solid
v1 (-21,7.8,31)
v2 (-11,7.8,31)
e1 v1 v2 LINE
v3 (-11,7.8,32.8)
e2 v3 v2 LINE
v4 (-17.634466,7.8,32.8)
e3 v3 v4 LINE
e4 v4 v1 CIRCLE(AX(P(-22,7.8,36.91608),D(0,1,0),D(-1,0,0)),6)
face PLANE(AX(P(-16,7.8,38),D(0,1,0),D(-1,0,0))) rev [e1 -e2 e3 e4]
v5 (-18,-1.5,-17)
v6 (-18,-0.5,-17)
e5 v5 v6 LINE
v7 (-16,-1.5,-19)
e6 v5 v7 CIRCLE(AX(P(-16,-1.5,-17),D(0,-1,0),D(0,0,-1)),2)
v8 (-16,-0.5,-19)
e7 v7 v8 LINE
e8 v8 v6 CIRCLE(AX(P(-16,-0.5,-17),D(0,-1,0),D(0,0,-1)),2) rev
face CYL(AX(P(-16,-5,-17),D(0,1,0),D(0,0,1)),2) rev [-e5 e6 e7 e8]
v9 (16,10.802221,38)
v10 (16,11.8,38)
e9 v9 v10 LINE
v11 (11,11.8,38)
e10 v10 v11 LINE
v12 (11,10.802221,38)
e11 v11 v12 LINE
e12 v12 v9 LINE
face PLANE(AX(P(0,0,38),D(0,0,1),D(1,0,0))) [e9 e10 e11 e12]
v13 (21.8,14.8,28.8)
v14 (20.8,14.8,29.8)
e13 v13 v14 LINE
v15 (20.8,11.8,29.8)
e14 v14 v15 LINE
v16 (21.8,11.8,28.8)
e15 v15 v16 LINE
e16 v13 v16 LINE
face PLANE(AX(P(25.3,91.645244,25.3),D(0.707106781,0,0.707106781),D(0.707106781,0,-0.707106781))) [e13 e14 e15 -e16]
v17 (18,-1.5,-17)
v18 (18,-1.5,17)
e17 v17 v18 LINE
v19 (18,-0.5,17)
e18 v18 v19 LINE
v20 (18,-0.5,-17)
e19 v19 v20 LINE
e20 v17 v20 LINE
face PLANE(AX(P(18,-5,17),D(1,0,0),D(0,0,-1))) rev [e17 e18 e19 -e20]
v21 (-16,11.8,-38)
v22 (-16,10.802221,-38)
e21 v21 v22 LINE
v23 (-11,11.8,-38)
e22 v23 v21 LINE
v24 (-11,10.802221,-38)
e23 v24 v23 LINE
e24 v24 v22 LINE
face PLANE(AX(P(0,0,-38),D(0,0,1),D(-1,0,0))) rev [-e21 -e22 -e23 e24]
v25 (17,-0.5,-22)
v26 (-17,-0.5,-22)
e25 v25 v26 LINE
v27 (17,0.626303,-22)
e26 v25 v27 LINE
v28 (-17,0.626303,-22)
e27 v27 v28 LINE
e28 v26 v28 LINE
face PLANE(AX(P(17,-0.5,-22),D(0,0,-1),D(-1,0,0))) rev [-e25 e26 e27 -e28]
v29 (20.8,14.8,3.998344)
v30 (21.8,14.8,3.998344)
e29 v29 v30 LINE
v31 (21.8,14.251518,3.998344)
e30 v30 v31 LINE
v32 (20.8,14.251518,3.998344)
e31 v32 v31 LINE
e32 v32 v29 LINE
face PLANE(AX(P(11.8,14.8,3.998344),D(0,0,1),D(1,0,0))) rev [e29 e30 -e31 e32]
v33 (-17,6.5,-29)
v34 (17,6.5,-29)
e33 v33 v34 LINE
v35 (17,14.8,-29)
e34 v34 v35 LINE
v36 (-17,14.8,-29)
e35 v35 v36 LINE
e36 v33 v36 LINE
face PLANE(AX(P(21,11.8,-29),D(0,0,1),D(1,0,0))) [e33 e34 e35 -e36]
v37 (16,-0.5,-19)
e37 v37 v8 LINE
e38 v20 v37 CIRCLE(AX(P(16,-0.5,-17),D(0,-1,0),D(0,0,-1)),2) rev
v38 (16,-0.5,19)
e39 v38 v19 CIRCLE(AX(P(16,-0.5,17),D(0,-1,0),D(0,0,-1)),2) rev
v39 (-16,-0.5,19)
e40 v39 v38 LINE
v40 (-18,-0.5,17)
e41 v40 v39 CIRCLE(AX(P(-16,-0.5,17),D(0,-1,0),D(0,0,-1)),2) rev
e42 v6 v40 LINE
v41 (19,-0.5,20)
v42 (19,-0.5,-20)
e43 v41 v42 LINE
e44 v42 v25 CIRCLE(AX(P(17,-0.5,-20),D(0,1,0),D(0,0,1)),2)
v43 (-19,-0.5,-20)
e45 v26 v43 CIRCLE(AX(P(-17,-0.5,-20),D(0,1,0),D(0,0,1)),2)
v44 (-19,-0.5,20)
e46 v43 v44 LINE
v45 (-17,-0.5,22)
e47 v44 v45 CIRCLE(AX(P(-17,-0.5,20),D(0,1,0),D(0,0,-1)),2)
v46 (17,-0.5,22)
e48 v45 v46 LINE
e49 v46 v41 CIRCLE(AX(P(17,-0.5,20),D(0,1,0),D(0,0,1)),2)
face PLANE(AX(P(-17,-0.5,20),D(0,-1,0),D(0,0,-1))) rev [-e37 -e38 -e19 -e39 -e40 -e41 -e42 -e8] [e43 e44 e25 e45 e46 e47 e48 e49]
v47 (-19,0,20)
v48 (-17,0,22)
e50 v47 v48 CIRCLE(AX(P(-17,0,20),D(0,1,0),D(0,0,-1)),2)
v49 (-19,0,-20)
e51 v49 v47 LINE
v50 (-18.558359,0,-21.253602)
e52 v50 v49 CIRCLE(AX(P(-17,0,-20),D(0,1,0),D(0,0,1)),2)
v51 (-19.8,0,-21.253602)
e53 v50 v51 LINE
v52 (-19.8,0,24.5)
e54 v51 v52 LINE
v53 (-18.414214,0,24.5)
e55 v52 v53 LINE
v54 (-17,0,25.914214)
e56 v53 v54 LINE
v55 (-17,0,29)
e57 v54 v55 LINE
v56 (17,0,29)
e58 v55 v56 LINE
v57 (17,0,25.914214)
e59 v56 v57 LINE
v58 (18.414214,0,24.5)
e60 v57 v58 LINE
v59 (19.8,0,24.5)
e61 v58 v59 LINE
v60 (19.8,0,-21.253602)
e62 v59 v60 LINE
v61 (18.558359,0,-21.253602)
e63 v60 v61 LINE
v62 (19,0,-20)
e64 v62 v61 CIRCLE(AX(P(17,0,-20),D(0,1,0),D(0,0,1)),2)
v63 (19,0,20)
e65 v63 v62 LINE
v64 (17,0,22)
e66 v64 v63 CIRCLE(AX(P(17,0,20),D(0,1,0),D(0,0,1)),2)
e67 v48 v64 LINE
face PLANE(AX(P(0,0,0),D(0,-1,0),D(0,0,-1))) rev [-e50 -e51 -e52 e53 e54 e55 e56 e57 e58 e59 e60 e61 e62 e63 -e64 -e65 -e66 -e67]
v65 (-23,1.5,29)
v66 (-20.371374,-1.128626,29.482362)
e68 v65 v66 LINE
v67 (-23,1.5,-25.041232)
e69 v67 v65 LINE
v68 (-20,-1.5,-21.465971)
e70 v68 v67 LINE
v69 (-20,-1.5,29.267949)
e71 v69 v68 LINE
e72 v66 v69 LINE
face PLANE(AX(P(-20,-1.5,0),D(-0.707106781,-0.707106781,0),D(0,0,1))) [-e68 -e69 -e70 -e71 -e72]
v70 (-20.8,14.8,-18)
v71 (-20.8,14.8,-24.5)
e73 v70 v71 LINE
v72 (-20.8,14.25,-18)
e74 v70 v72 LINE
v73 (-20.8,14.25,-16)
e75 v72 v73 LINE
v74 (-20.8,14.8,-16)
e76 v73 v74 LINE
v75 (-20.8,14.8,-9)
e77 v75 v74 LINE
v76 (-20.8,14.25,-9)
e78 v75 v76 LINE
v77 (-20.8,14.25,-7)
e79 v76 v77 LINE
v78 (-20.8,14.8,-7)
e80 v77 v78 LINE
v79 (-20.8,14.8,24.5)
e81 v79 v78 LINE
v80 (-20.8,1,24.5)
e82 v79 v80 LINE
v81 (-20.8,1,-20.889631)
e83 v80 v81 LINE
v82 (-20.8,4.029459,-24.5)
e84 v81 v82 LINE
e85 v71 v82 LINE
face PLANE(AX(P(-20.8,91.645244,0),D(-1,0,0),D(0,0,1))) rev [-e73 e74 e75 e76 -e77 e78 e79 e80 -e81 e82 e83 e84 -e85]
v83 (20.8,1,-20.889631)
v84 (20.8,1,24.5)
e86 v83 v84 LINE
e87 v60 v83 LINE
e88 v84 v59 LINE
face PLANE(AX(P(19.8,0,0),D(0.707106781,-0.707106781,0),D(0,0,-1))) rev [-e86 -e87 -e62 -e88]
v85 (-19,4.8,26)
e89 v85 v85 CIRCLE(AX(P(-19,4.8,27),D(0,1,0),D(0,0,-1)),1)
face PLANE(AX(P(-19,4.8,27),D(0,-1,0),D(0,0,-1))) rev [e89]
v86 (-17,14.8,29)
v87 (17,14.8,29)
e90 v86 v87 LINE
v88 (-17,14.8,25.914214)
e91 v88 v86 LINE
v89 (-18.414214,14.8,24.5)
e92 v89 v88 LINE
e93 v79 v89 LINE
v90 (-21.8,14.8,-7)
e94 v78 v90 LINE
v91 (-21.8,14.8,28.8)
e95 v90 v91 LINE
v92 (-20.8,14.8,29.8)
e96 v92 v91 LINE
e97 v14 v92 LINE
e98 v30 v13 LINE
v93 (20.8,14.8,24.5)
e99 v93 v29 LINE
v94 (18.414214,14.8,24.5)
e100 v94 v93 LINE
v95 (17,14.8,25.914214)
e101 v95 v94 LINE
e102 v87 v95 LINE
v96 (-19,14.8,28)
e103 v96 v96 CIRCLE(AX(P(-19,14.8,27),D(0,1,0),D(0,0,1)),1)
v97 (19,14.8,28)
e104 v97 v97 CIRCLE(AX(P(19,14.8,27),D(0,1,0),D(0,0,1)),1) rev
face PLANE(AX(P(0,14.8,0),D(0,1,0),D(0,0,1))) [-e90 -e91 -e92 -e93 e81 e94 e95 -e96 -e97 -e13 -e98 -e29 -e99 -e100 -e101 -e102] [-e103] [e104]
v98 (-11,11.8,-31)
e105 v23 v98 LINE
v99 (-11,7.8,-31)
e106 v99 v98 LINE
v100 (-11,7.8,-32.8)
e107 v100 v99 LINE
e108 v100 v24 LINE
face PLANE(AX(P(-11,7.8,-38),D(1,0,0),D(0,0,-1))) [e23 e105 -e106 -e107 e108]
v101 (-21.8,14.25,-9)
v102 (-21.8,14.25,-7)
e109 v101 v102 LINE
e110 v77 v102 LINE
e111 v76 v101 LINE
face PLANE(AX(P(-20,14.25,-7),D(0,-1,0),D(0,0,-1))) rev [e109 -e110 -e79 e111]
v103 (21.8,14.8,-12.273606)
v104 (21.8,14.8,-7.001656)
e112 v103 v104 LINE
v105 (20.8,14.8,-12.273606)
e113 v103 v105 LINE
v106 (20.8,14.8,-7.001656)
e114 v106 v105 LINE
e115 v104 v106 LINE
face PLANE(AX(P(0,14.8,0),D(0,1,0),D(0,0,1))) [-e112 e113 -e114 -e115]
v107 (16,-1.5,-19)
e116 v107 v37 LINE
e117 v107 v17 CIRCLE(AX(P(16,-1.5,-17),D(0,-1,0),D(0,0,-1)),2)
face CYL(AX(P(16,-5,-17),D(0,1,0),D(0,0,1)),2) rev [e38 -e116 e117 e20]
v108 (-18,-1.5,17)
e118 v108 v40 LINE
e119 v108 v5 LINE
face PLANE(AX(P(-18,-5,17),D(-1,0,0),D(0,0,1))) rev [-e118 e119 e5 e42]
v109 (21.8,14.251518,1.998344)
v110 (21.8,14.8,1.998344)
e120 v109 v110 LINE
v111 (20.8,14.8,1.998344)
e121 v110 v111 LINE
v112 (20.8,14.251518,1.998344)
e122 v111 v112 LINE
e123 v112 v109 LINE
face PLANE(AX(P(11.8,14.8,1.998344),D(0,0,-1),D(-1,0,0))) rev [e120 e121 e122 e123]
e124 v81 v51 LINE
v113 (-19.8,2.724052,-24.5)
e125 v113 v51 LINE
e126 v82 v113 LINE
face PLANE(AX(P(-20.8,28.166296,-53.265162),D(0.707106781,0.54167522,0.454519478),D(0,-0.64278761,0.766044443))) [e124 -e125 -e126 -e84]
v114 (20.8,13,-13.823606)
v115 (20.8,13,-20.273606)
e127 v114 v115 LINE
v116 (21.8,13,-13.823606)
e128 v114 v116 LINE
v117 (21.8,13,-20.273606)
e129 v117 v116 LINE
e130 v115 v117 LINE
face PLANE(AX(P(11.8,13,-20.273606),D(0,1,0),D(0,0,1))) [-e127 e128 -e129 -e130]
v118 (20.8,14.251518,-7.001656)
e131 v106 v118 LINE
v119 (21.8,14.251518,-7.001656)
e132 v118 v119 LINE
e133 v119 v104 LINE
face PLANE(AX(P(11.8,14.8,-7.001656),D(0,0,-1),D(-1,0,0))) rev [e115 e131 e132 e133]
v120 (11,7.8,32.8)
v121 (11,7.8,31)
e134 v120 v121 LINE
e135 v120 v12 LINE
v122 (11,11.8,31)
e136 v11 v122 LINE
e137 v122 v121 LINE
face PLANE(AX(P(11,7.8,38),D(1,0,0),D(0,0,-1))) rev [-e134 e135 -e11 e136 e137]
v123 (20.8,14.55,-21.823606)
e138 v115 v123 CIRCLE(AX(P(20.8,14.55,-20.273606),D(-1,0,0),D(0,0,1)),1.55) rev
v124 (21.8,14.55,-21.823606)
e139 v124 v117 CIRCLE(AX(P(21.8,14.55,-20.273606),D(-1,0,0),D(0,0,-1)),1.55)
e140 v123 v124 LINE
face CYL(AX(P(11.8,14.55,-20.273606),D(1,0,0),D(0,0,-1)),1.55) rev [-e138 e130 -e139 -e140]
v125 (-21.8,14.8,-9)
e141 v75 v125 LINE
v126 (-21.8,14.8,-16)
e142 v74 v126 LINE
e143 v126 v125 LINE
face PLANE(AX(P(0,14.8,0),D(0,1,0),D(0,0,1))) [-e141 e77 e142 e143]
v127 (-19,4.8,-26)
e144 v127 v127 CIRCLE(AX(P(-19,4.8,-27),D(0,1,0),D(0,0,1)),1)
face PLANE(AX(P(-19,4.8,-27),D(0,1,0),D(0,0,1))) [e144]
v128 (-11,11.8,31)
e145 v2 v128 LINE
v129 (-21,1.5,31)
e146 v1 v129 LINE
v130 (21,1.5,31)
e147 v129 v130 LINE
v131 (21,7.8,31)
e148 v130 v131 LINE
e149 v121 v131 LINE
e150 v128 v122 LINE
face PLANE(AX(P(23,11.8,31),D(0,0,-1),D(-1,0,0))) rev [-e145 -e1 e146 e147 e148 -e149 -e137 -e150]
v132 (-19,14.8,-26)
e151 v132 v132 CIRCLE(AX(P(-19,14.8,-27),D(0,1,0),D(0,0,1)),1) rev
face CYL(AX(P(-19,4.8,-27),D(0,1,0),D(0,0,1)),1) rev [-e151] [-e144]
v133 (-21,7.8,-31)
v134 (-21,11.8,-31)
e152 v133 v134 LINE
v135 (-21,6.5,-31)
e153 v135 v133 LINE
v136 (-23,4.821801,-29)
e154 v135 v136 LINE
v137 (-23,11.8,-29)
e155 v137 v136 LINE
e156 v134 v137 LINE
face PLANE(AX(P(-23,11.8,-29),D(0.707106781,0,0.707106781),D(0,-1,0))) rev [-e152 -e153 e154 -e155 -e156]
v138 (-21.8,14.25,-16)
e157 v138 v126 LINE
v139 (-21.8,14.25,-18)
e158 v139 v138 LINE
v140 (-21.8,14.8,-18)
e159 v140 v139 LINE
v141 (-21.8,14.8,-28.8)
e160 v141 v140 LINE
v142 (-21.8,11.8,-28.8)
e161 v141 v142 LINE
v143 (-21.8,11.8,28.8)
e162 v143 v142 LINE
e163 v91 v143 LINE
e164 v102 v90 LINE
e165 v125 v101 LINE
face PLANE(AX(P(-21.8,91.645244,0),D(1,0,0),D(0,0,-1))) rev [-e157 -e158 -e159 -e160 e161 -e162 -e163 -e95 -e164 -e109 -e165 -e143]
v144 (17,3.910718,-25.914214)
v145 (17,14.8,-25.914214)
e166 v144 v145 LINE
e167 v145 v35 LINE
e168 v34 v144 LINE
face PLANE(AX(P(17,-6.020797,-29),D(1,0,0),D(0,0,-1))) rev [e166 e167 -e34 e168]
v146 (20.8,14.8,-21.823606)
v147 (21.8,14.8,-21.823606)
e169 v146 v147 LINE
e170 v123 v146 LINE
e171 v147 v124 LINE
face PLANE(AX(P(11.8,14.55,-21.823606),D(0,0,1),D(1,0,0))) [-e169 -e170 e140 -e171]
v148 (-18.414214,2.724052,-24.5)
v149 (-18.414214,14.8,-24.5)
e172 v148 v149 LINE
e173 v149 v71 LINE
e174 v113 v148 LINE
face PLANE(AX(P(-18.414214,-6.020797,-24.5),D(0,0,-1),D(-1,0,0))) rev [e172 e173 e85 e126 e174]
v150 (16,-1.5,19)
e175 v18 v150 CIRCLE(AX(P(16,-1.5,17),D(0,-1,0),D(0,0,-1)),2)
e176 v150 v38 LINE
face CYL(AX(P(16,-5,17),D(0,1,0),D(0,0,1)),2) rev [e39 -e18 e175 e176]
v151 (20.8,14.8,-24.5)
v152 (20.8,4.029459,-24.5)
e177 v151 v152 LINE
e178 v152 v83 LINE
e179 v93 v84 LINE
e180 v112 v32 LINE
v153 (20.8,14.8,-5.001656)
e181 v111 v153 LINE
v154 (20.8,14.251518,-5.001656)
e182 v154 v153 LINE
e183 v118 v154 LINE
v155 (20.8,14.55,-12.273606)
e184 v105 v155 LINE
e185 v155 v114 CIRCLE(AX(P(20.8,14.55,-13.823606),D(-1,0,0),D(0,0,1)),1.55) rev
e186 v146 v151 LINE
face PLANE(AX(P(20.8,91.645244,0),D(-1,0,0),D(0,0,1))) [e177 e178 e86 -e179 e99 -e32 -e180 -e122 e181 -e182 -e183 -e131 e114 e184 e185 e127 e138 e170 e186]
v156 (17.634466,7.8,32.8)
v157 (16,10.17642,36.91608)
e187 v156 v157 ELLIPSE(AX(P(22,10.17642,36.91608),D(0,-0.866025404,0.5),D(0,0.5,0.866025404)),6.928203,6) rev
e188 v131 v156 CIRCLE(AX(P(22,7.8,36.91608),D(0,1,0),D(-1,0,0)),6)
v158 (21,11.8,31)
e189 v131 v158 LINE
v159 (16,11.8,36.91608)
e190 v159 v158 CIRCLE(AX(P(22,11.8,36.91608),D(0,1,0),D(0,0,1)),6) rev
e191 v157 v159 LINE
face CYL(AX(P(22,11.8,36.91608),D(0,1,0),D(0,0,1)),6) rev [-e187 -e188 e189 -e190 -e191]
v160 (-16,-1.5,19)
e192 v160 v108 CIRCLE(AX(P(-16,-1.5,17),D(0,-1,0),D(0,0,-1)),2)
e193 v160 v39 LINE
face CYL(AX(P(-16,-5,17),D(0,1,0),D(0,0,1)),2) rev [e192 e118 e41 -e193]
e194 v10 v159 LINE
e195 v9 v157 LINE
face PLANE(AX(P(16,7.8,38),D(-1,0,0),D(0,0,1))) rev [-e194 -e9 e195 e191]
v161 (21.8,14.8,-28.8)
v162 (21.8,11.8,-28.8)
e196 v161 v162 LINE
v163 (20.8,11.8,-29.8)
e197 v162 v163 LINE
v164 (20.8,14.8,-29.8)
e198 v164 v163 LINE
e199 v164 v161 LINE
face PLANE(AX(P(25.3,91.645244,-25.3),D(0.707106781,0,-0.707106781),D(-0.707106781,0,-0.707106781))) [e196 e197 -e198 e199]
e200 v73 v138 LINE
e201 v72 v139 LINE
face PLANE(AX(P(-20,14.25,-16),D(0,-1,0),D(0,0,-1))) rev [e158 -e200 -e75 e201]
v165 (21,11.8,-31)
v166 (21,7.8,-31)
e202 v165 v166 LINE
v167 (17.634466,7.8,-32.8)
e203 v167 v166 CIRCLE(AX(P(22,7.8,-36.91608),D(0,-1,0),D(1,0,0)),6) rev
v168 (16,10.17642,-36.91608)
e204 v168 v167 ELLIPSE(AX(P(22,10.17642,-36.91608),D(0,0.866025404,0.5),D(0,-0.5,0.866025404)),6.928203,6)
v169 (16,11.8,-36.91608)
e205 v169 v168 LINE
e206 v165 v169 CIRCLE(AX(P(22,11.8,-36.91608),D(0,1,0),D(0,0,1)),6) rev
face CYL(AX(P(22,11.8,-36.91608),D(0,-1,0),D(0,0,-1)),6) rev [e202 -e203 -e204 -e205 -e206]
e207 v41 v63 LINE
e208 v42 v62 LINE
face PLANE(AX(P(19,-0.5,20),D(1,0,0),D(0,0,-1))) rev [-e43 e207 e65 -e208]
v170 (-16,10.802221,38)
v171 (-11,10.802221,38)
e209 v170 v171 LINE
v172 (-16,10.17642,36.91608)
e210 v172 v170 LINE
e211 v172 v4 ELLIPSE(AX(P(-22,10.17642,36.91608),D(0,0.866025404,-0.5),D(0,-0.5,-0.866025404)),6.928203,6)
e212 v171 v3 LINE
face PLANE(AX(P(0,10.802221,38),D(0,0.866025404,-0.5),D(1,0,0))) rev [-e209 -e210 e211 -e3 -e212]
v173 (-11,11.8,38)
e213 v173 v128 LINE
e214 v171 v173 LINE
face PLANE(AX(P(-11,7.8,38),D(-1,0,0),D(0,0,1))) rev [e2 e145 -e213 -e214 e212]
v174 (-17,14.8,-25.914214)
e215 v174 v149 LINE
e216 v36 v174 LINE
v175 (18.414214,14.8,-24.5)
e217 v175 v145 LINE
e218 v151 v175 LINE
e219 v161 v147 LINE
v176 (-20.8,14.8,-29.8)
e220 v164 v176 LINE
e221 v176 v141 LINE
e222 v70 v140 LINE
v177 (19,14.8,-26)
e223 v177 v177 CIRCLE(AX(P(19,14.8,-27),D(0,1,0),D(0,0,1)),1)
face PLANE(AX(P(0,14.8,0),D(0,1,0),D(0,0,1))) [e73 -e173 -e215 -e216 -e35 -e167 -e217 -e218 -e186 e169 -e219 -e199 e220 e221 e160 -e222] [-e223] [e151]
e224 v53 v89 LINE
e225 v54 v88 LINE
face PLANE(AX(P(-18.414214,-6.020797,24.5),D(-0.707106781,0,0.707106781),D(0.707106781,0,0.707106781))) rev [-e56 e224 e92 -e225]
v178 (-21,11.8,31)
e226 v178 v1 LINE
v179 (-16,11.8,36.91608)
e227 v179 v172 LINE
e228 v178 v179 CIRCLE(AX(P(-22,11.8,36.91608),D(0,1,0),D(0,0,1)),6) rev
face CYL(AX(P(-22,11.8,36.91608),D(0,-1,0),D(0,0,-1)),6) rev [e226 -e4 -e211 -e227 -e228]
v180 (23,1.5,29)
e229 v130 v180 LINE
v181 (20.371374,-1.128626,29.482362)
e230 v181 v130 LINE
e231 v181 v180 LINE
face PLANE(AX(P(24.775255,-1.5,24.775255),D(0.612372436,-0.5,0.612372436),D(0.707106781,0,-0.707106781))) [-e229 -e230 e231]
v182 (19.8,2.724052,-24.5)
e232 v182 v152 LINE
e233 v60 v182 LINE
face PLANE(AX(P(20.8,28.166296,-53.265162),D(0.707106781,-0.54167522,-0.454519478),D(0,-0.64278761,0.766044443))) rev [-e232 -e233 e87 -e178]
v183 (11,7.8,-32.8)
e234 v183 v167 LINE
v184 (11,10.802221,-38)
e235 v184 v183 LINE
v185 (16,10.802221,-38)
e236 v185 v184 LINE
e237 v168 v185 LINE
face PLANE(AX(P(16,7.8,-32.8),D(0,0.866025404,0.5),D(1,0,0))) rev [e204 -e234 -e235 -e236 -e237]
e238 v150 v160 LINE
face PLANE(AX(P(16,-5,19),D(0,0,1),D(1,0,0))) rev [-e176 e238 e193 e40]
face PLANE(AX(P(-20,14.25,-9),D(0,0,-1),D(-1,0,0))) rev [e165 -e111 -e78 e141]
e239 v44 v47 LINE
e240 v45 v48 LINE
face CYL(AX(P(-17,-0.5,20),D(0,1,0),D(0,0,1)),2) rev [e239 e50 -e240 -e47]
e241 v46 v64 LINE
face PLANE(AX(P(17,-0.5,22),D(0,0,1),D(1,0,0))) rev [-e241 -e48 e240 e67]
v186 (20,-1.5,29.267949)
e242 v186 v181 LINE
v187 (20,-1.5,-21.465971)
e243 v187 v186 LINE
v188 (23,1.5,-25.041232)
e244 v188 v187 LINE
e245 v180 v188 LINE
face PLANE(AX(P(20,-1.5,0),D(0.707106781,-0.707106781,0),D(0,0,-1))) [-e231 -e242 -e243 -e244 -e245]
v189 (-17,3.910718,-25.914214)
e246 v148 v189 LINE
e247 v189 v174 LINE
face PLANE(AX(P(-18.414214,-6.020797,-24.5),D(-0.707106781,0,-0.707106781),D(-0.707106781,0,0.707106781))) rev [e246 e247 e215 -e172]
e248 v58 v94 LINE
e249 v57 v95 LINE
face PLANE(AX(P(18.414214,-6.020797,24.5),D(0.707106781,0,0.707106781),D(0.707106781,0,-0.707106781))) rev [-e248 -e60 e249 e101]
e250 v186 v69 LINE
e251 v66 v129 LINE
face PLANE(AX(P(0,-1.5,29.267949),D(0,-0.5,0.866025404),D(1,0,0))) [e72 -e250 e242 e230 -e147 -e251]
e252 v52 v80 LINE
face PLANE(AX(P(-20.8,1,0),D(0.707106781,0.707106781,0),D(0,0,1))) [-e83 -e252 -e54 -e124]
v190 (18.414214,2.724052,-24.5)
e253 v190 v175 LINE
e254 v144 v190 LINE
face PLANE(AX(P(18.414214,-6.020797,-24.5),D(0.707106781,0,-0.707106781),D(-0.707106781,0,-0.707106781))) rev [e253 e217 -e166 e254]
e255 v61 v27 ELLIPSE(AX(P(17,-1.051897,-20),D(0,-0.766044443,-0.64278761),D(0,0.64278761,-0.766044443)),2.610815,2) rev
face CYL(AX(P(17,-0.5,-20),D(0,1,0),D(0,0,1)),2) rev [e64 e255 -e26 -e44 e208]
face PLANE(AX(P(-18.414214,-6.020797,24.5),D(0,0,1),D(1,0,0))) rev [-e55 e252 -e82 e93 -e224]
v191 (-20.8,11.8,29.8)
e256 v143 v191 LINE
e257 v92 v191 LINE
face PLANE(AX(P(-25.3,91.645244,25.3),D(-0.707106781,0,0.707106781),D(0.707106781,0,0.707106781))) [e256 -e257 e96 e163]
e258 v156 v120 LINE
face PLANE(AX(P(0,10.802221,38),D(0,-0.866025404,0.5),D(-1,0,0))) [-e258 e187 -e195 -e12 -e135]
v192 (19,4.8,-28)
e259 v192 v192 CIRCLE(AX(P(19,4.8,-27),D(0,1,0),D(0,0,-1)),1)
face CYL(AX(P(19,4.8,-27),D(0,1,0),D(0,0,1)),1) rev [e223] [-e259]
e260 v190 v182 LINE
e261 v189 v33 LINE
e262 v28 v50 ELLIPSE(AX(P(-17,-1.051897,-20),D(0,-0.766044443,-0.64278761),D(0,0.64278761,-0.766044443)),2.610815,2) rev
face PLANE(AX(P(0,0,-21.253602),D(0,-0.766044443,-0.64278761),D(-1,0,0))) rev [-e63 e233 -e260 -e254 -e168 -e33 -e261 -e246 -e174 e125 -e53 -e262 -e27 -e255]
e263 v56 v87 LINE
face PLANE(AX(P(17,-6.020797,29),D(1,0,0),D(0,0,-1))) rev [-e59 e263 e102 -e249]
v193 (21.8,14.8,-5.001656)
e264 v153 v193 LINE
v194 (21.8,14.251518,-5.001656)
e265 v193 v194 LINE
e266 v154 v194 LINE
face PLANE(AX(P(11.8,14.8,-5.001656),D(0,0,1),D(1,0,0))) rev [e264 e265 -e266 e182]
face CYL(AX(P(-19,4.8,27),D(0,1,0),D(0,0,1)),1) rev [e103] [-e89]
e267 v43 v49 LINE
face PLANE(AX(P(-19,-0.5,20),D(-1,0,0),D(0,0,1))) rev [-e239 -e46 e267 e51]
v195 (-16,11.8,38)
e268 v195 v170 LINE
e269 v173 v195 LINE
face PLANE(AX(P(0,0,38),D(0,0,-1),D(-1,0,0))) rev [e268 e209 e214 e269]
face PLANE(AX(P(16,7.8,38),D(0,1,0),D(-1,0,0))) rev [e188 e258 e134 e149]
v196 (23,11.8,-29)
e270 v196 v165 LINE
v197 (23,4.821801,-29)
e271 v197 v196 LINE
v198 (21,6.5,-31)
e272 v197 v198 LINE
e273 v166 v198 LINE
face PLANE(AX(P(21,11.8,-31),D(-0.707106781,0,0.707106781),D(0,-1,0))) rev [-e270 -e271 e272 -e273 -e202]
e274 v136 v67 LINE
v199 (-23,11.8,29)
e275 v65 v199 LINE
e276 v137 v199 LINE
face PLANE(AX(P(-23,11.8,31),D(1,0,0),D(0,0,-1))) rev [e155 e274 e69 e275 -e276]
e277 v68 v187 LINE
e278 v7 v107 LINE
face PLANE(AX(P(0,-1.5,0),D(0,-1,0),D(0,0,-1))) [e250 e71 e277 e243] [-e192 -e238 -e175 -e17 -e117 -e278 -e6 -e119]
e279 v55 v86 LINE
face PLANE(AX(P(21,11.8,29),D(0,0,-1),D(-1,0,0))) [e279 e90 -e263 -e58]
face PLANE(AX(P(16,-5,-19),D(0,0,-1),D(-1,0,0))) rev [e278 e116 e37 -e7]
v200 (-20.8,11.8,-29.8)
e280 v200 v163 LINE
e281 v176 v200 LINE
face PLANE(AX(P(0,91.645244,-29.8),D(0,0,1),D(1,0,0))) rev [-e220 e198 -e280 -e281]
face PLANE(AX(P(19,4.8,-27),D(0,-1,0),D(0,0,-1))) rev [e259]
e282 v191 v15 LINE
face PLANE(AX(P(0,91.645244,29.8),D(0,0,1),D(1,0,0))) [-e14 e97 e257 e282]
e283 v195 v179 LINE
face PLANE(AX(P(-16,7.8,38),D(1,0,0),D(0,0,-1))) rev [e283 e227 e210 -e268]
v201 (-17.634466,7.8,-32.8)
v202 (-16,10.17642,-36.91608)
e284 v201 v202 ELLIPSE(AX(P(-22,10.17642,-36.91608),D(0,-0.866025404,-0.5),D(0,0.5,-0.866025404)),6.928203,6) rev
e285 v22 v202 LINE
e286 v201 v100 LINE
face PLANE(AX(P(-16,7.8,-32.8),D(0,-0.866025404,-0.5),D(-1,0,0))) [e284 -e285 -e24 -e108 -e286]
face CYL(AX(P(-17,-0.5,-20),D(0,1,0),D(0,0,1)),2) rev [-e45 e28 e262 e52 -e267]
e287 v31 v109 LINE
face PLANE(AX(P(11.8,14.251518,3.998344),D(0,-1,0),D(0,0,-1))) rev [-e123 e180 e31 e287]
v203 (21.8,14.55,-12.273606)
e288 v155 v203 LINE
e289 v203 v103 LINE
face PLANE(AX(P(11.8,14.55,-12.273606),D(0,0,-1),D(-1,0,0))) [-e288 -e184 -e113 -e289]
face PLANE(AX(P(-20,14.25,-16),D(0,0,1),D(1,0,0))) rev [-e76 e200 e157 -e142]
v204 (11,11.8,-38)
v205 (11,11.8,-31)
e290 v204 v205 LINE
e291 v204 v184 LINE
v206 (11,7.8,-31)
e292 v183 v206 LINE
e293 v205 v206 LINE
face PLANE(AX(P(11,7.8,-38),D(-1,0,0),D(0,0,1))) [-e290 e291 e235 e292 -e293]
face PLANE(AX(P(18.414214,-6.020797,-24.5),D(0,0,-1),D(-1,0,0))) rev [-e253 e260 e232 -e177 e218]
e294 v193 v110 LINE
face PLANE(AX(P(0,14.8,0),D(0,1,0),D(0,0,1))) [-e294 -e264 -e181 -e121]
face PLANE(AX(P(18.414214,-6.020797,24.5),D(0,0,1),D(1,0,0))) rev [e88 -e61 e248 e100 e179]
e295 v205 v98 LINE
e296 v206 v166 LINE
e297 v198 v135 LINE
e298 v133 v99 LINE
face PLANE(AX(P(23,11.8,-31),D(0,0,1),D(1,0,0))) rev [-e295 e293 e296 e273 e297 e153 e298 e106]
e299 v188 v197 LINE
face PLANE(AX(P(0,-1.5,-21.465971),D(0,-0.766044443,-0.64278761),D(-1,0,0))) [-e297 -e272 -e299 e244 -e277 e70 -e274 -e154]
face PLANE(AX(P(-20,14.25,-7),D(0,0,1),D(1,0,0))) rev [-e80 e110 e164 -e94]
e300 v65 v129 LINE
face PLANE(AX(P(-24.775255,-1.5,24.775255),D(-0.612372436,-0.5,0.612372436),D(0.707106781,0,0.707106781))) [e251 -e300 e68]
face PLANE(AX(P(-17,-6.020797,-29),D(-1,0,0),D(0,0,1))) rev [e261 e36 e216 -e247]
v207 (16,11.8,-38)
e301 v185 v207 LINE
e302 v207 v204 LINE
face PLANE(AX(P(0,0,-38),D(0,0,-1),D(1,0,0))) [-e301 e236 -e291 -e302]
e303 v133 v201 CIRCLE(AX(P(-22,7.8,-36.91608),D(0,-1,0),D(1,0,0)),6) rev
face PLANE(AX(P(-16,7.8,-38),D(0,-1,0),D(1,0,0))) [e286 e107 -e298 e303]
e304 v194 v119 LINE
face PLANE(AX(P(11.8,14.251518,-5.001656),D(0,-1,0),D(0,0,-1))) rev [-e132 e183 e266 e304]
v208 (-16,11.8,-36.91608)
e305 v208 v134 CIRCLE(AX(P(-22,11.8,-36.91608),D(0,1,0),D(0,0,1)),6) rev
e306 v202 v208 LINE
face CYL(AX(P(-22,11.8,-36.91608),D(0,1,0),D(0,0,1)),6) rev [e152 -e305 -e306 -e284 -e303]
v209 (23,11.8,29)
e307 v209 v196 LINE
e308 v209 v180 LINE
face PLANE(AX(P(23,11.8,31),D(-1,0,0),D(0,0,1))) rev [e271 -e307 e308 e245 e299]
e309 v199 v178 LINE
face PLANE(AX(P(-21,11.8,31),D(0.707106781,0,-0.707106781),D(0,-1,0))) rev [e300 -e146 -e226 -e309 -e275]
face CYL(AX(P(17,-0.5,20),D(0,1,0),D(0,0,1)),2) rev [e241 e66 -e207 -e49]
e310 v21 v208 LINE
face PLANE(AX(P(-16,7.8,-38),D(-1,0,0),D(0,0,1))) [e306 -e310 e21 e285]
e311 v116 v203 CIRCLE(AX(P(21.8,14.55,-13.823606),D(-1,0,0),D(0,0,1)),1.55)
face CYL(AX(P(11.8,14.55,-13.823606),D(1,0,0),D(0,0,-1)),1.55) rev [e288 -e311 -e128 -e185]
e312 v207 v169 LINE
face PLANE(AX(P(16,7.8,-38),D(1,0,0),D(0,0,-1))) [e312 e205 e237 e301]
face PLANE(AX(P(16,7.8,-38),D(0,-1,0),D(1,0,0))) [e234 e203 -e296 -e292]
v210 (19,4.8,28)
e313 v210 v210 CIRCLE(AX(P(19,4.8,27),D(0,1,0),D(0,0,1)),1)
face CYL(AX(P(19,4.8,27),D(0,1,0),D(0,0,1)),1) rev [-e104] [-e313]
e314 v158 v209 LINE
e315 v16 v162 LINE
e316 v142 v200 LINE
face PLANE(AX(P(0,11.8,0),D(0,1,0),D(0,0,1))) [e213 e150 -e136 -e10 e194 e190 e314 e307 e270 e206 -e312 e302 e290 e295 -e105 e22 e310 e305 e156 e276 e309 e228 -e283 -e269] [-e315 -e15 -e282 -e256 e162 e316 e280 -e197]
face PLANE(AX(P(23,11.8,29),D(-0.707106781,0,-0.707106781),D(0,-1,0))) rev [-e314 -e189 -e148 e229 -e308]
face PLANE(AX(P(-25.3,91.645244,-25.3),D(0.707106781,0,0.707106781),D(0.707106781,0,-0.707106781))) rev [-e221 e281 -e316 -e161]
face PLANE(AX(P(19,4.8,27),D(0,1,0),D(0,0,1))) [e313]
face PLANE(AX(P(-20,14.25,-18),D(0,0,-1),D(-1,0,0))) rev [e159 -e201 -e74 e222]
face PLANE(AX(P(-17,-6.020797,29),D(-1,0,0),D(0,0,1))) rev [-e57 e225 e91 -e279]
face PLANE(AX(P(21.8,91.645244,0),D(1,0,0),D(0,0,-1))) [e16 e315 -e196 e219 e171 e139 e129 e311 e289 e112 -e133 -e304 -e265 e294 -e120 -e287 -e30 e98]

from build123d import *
from OCP.BRepFilletAPI import BRepFilletAPI_MakeChamfer

# Parameters (mm, degrees)
SKETCH1_W                           = 46
SKETCH1_H                           = 62
SKETCH1_W_2                         = 42
SKETCH1_H_2                         = 58
MAIN_SKETCH_DEPTH                   = 11.8
SKETCH2_W                           = 46
SKETCH2_H                           = 62
FLOOR_2_DEPTH                       = 1.5
CHAMFER_OUTER_CORNERS_SIZE          = 2
MATERIAL_FOR_HOLES_DEPTH            = 11.8
GLASS_HOLE_DEPTH                    = 5
GLASS_GLUING_SURFACE_DEPTH          = 0.5
CHAMFER_TOP_SIZE                    = 3
CHAMFER_TOP_SIZE2                   = 1.732050808
SKETCH21_R                          = 1
MOUNTING_HOLES_DEPTH                = 7
LOWER_START                         = 14.8
SKETCH22_R                          = 1
LOWER_TAB_DEPTH                     = 14.8
TYPE_C_CONNECTOR_DEPTH              = 10
SKETCH20_W                          = 5
SKETCH20_H                          = 4
STRAP_MOUNTS_DEPTH                  = 7
STRAP_CHAMFER_SIZE                  = 5.2
STRAP_CHAMFER_SIZE2                 = 3.0022214
STRAP_CHAMFER_OF_STRAP_MIRROR_SIZE  = 5.2
STRAP_CHAMFER_OF_STRAP_MIRROR_SIZE2 = 3.0022214
STRAP_FILLET_R                      = 6
SKETCH26_W                          = 2
SKETCH26_H                          = 0.54848205
BUTTON_CUTOUT_DEPTH                 = 10
SKETCH28_W                          = 2
SKETCH28_H                          = 0.55
CUT_EXTRUDE21_DEPTH                 = 1.8
CHAMFER7_START                      = -22
CHAMFER7_DEPTH                      = 44
CHAMFER7_2_DEPTH                    = 5
CHAMFER7_START_2                    = 17
CHAMFER7_3_DEPTH                    = 5
CHAMFER7_START_3                    = 4.8
CHAMFER7_4_OUTLINE_R                = 1
CHAMFER7_4_DEPTH                    = 2.2
CHAMFER7_5_DEPTH                    = 4.8
CHAMFER8_SIZE                       = 8
CHAMFER8_SIZE2                      = 9.534028741
CHAMFER11_SIZE                      = 1
CHAMFER12_SIZE                      = 3


with BuildPart() as part:
    # Sketch1 → Main sketch (new body)
    with BuildSketch(Plane(origin=(0, 0, 0), x_dir=(1, 0, 0), z_dir=(0, 1, 0))):
        Rectangle(SKETCH1_W, SKETCH1_H)
        Rectangle(SKETCH1_W_2, SKETCH1_H_2, mode=Mode.SUBTRACT)
    extrude(amount=MAIN_SKETCH_DEPTH)

    # Sketch2 → Floor 2 (add)
    with BuildSketch(Plane.XZ):
        Rectangle(SKETCH2_W, SKETCH2_H)
    extrude(amount=FLOOR_2_DEPTH)

    # Chamfer_Outer Corners
    chamfer_outer_corners_edges = [part.edges().sort_by_distance(p)[0] for p in [
        (-23, 5.15, -31),
        (23, 5.15, -31),
        (23, 5.15, 31),
        (-23, 5.15, 31),
    ]]
    chamfer(chamfer_outer_corners_edges, length=CHAMFER_OUTER_CORNERS_SIZE)

    # Sketch17 → Material for holes (add)
    with BuildSketch(Plane(origin=(0, 11.8, -8.5), x_dir=(1, 0, 0), z_dir=(0, -1, 0))):
        Polygon((18.414213562, 33), (21, 33), (21, 37.5), (17, 37.5), (17, 34.414213562), align=None)
        Polygon((18.414213562, -16), (17, -17.414213562), (17, -20.5), (21, -20.5), (21, -16), align=None)
        Polygon((-18.414213562, -16), (-21, -16), (-21, -20.5), (-17, -20.5), (-17, -17.414213562), align=None)
        Polygon((-18.414213562, 33), (-17, 34.414213562), (-17, 37.5), (-21, 37.5), (-21, 33), align=None)
    extrude(amount=MATERIAL_FOR_HOLES_DEPTH)

    # Sketch14 → Glass hole (cut)
    with BuildSketch(Plane(origin=(0, 0, 0), x_dir=(1, 0, 0), z_dir=(0, 1, 0))):
        with BuildLine():
            Line((16, -19), (-16, -19))
            ThreePointArc((-16, -19), (-17.414213562, -18.414213562), (-18, -17))
            Line((-18, -17), (-18, 17))
            ThreePointArc((-18, 17), (-17.414213562, 18.414213562), (-16, 19))
            Line((-16, 19), (16, 19))
            ThreePointArc((16, 19), (17.414213562, 18.414213562), (18, 17))
            Line((18, 17), (18, -17))
            ThreePointArc((18, -17), (17.414213562, -18.414213562), (16, -19))
        make_face()
    extrude(amount=-GLASS_HOLE_DEPTH, mode=Mode.SUBTRACT)

    # Sketch11 → Glass gluing surface (cut)
    with BuildSketch(Plane(origin=(0, 0, 0), x_dir=(1, 0, 0), z_dir=(0, 1, 0))):
        with BuildLine():
            Line((17, -22), (-17, -22))
            ThreePointArc((-17, -22), (-18.414213562, -21.414213562), (-19, -20))
            Line((-19, -20), (-19, 20))
            ThreePointArc((-19, 20), (-18.414213562, 21.414213562), (-17, 22))
            Line((-17, 22), (17, 22))
            ThreePointArc((17, 22), (18.414213562, 21.414213562), (19, 20))
            Line((19, 20), (19, -20))
            ThreePointArc((19, -20), (18.414213562, -21.414213562), (17, -22))
        make_face()
    extrude(amount=-GLASS_GLUING_SURFACE_DEPTH, mode=Mode.SUBTRACT)

    # Chamfer_ top: one chamfer whose edges measure the first distance from different faces: ONE call of the kernel's chamfer builder (chamfer() names one face for all edges)
    chamfer_top_edges_1 = [part.edges().sort_by_distance(p)[0] for p in [
        (0, -1.5, 31),
    ]]
    chamfer_top_side_1 = [part.faces().sort_by_distance(p)[0] for p in [
        (0, 5.15, 31),
    ]]
    chamfer_top_edges_2 = [part.edges().sort_by_distance(p)[0] for p in [
        (22, -1.5, 30),
    ]]
    chamfer_top_side_2 = [part.faces().sort_by_distance(p)[0] for p in [
        (22, 5.15, 30),
    ]]
    chamfer_top_edges_3 = [part.edges().sort_by_distance(p)[0] for p in [
        (-22, -1.5, 30),
    ]]
    chamfer_top_side_3 = [part.faces().sort_by_distance(p)[0] for p in [
        (-22, 5.15, 30),
    ]]
    chamfer_top = BRepFilletAPI_MakeChamfer(part.part.solid().wrapped)
    for e in chamfer_top_edges_1:
        chamfer_top.Add(CHAMFER_TOP_SIZE, CHAMFER_TOP_SIZE2, e.wrapped, chamfer_top_side_1[0].wrapped)  # the first distance lies on this face
    for e in chamfer_top_edges_2:
        chamfer_top.Add(CHAMFER_TOP_SIZE, CHAMFER_TOP_SIZE2, e.wrapped, chamfer_top_side_2[0].wrapped)  # the first distance lies on this face
    for e in chamfer_top_edges_3:
        chamfer_top.Add(CHAMFER_TOP_SIZE, CHAMFER_TOP_SIZE2, e.wrapped, chamfer_top_side_3[0].wrapped)  # the first distance lies on this face
    add(Compound.cast(chamfer_top.Shape()), mode=Mode.REPLACE)

    # Sketch21 → Mounting Holes (cut)
    with BuildSketch(Plane(origin=(0, 11.8, 0), x_dir=(1, 0, 0), z_dir=(0, 1, 0))):
        with Locations(Location((19, -27, 0), (0, 0, 270))):
            Circle(SKETCH21_R)
        with Locations(Location((-19, -27, 0), (0, 0, 90))):
            Circle(SKETCH21_R)
        with Locations(Location((-19, 27, 0), (0, 0, 270))):
            Circle(SKETCH21_R)
        with Locations(Location((19, 27, 0), (0, 0, 90))):
            Circle(SKETCH21_R)
    extrude(amount=-MOUNTING_HOLES_DEPTH, mode=Mode.SUBTRACT)

    # Sketch22 → Lower Tab (add)
    with BuildSketch(Plane(origin=(0, 0, 0), x_dir=(1, 0, 0), z_dir=(0, 1, 0)).offset(LOWER_START)):
        Polygon((20.8, 29.8), (-20.8, 29.8), (-21.8, 28.8), (-21.8, -28.8), (-20.8, -29.8), (20.8, -29.8), (21.8, -28.8), (21.8, 28.8), align=None)
        with Locations(Location((-19, -27, 0), (0, 0, 270))):
            Circle(SKETCH22_R, mode=Mode.SUBTRACT)
        with Locations(Location((19, -27, 0), (0, 0, 270))):
            Circle(SKETCH22_R, mode=Mode.SUBTRACT)
        with Locations(Location((-19, 27, 0), (0, 0, 270))):
            Circle(SKETCH22_R, mode=Mode.SUBTRACT)
        with Locations(Location((19, 27, 0), (0, 0, 270))):
            Circle(SKETCH22_R, mode=Mode.SUBTRACT)
        Polygon((-20.8, -24.5), (-18.414213562, -24.5), (-17, -25.914213562), (-17, -29), (17, -29), (17, -25.914213562), (18.414213562, -24.5), (20.8, -24.5), (20.8, 24.5), (18.414213562, 24.5), (17, 25.914213562), (17, 29), (-17, 29), (-17, 25.914213562), (-18.414213562, 24.5), (-20.8, 24.5), align=None, mode=Mode.SUBTRACT)
    extrude(amount=-LOWER_TAB_DEPTH)

    # Sketch24 → Type C Connector (cut)
    with BuildSketch(Plane(origin=(21.8, 0, -8), x_dir=(0, 0, 1), z_dir=(-1, 0, 0))):
        with BuildLine():
            Line((-13.823605705, 14.8), (-4.273605705, 14.8))
            Line((-4.273605705, 14.8), (-4.273605705, 14.55))
            ThreePointArc((-4.273605705, 14.55), (-4.727590194, 13.453984489), (-5.823605705, 13))
            Line((-5.823605705, 13), (-12.273605705, 13))
            ThreePointArc((-12.273605705, 13), (-13.369621216, 13.453984489), (-13.823605705, 14.55))
            Line((-13.823605705, 14.55), (-13.823605705, 14.8))
        make_face()
    extrude(amount=TYPE_C_CONNECTOR_DEPTH, mode=Mode.SUBTRACT)

    # Sketch20 → Strap Mounts (add)
    with BuildSketch(Plane.XY.offset(31)):
        with Locations((13.5, 9.8)):
            Rectangle(SKETCH20_W, SKETCH20_H)
        with Locations((-13.5, 9.8)):
            Rectangle(SKETCH20_W, SKETCH20_H)
    strap_mounts = extrude(amount=STRAP_MOUNTS_DEPTH)

    # Strap Chamfer: one chamfer whose edges measure the first distance from different faces: ONE call of the kernel's chamfer builder (chamfer() names one face for all edges)
    strap_chamfer_edges_1 = [part.edges().sort_by_distance(p)[0] for p in [
        (13.5, 7.8, 38),
    ]]
    strap_chamfer_side_1 = [part.faces().sort_by_distance(p)[0] for p in [
        (13.5, 7.8, 34.5),
    ]]
    strap_chamfer_edges_2 = [part.edges().sort_by_distance(p)[0] for p in [
        (-13.5, 7.8, 38),
    ]]
    strap_chamfer_side_2 = [part.faces().sort_by_distance(p)[0] for p in [
        (-13.5, 7.8, 34.5),
    ]]
    strap_chamfer = BRepFilletAPI_MakeChamfer(part.part.solid().wrapped)
    for e in strap_chamfer_edges_1:
        strap_chamfer.Add(STRAP_CHAMFER_SIZE, STRAP_CHAMFER_SIZE2, e.wrapped, strap_chamfer_side_1[0].wrapped)  # the first distance lies on this face
    for e in strap_chamfer_edges_2:
        strap_chamfer.Add(STRAP_CHAMFER_SIZE, STRAP_CHAMFER_SIZE2, e.wrapped, strap_chamfer_side_2[0].wrapped)  # the first distance lies on this face
    add(Compound.cast(strap_chamfer.Shape()), mode=Mode.REPLACE)

    # Strap Mirror: Strap Mounts across plane
    add(strap_mounts.mirror(Plane.XY))

    # Strap Chamfer of Strap Mirror: one chamfer whose edges measure the first distance from different faces: ONE call of the kernel's chamfer builder (chamfer() names one face for all edges)
    strap_chamfer_of_strap_mirror_edges_1 = [part.edges().sort_by_distance(p)[0] for p in [
        (13.5, 7.8, -38),
    ]]
    strap_chamfer_of_strap_mirror_side_1 = [part.faces().sort_by_distance(p)[0] for p in [
        (13.5, 7.8, -34.5),
    ]]
    strap_chamfer_of_strap_mirror_edges_2 = [part.edges().sort_by_distance(p)[0] for p in [
        (-13.5, 7.8, -38),
    ]]
    strap_chamfer_of_strap_mirror_side_2 = [part.faces().sort_by_distance(p)[0] for p in [
        (-13.5, 7.8, -34.5),
    ]]
    strap_chamfer_of_strap_mirror = BRepFilletAPI_MakeChamfer(part.part.solid().wrapped)
    for e in strap_chamfer_of_strap_mirror_edges_1:
        strap_chamfer_of_strap_mirror.Add(STRAP_CHAMFER_OF_STRAP_MIRROR_SIZE, STRAP_CHAMFER_OF_STRAP_MIRROR_SIZE2, e.wrapped, strap_chamfer_of_strap_mirror_side_1[0].wrapped)  # the first distance lies on this face
    for e in strap_chamfer_of_strap_mirror_edges_2:
        strap_chamfer_of_strap_mirror.Add(STRAP_CHAMFER_OF_STRAP_MIRROR_SIZE, STRAP_CHAMFER_OF_STRAP_MIRROR_SIZE2, e.wrapped, strap_chamfer_of_strap_mirror_side_2[0].wrapped)  # the first distance lies on this face
    add(Compound.cast(strap_chamfer_of_strap_mirror.Shape()), mode=Mode.REPLACE)

    # Strap Fillet
    # the kernel refuses this fillet: 6 mm, written as the material it adds along each edge
    with BuildSketch(Plane(origin=(16, 11.8, 31), x_dir=(1, 0, 0), z_dir=(0, -1, 0))) as strap_fillet_piece_1_section:
        with BuildLine():
            CenterArc((6, 5.916079783), STRAP_FILLET_R, 180, 80.405931773)
            Line((0, 5.916079783), (0, 0))
            Line((0, 0), (5, 0))
        make_face()
    strap_fillet_piece_1 = extrude(amount=4, mode=Mode.PRIVATE)
    strap_fillet_piece_1 = split(strap_fillet_piece_1, bisect_by=Plane(origin=(16, 8.020577137, 33.182050808), z_dir=(0, 0.8660254037844382, -0.5000000000000009)), keep=Keep.TOP, mode=Mode.PRIVATE)
    add(strap_fillet_piece_1)
    with BuildSketch(Plane(origin=(-16, 11.8, 31), x_dir=(-1, 0, 0), z_dir=(0, -1, 0))) as strap_fillet_piece_2_section:
        with BuildLine():
            CenterArc((6, -5.916079783), STRAP_FILLET_R, 99.594068227, 80.405931773)
            Line((0, -5.916079783), (0, 0))
            Line((0, 0), (5, 0))
        make_face()
    strap_fillet_piece_2 = extrude(amount=4, mode=Mode.PRIVATE)
    strap_fillet_piece_2 = split(strap_fillet_piece_2, bisect_by=Plane(origin=(-16, 8.020577137, 33.182050808), z_dir=(0, 0.8660254037844382, -0.5000000000000009)), keep=Keep.TOP, mode=Mode.PRIVATE)
    add(strap_fillet_piece_2)
    with BuildSketch(Plane(origin=(16, 11.8, -31), x_dir=(0, 0, -1), z_dir=(0, -1, 0))) as strap_fillet_piece_3_section:
        with BuildLine():
            CenterArc((5.916079783, 6), STRAP_FILLET_R, 189.594068227, 80.405931773)
            Line((0, 5), (0, 0))
            Line((0, 0), (5.916079783, 0))
        make_face()
    strap_fillet_piece_3 = extrude(amount=4, mode=Mode.PRIVATE)
    strap_fillet_piece_3 = split(strap_fillet_piece_3, bisect_by=Plane(origin=(16, 8.020577137, -33.182050808), z_dir=(0, 0.8660254037844382, 0.5000000000000009)), keep=Keep.TOP, mode=Mode.PRIVATE)
    add(strap_fillet_piece_3)
    with BuildSketch(Plane(origin=(-16, 11.8, -31), x_dir=(-1, 0, 0), z_dir=(0, -1, 0))) as strap_fillet_piece_4_section:
        with BuildLine():
            CenterArc((6, 5.916079783), STRAP_FILLET_R, 180, 80.405931773)
            Line((0, 5.916079783), (0, 0))
            Line((0, 0), (5, 0))
        make_face()
    strap_fillet_piece_4 = extrude(amount=4, mode=Mode.PRIVATE)
    strap_fillet_piece_4 = split(strap_fillet_piece_4, bisect_by=Plane(origin=(-16, 8.020577137, -33.182050808), z_dir=(0, 0.8660254037844382, 0.5000000000000009)), keep=Keep.TOP, mode=Mode.PRIVATE)
    add(strap_fillet_piece_4)

    # Sketch26 → Button_Cutout (cut)
    with BuildSketch(Plane(origin=(21.8, 0, 0), x_dir=(0, 0, -1), z_dir=(1, 0, 0))):
        with Locations((6.001655918, 14.525758975)):
            Rectangle(SKETCH26_W, SKETCH26_H)
        with Locations((-2.998344082, 14.525758975)):
            Rectangle(SKETCH26_W, SKETCH26_H)
    extrude(amount=-BUTTON_CUTOUT_DEPTH, mode=Mode.SUBTRACT)

    # Sketch28 → Cut-Extrude21 (cut)
    with BuildSketch(Plane.ZY.offset(21.8)):
        with Locations((-8, 14.525)):
            Rectangle(SKETCH28_W, SKETCH28_H)
        with Locations((-17, 14.525)):
            Rectangle(SKETCH28_W, SKETCH28_H)
    extrude(amount=-CUT_EXTRUDE21_DEPTH, mode=Mode.SUBTRACT)

    # Chamfer7: read off the stored shape, not the designer's step
    # Chamfer7 outline → Chamfer7 (add)
    with BuildSketch(Plane.YZ.offset(CHAMFER7_START)):
        Polygon((0.626302582, -22), (0, -22), (0, -29), (6.5, -29), align=None)
    extrude(amount=CHAMFER7_DEPTH)

    # Chamfer7 2 outline → Chamfer7 2 (add)
    with BuildSketch(Plane.YZ.offset(CHAMFER7_START)):
        Polygon((0, -21.253601648), (0, -22), (0.626302582, -22), align=None)
    extrude(amount=CHAMFER7_2_DEPTH)

    # Chamfer7 3 outline → Chamfer7 3 (add)
    with BuildSketch(Plane.YZ.offset(CHAMFER7_START_2)):
        Polygon((0, -21.253601648), (0, -22), (0.626302582, -22), align=None)
    extrude(amount=CHAMFER7_3_DEPTH)

    # Chamfer7 4 outline → Chamfer7 4 (cut)
    with BuildSketch(Plane(origin=(0, 0, 0), x_dir=(1, 0, 0), z_dir=(0, 1, 0)).offset(CHAMFER7_START_3)):
        with Locations((-19, 27)):
            Circle(CHAMFER7_4_OUTLINE_R)
        with Locations((19, 27)):
            Circle(CHAMFER7_4_OUTLINE_R)
    extrude(amount=CHAMFER7_4_DEPTH, mode=Mode.SUBTRACT)

    # Chamfer7 5 outline → Chamfer7 5 (cut)
    with BuildSketch(Plane(origin=(0, 0, 0), x_dir=(1, 0, 0), z_dir=(0, 1, 0))):
        with BuildLine():
            Line((17, 22), (17, 21.253601648))
            Line((17, 21.253601648), (18.558359043, 21.253601648))
            ThreePointArc((18.558359043, 21.253601648), (17.863943489, 21.803774279), (17, 22))
        make_face()
        with BuildLine():
            ThreePointArc((-17, 22), (-17.863943489, 21.803774279), (-18.558359043, 21.253601648))
            Line((-18.558359043, 21.253601648), (-17, 21.253601648))
            Line((-17, 21.253601648), (-17, 22))
        make_face()
    extrude(amount=CHAMFER7_5_DEPTH, mode=Mode.SUBTRACT)

    # Chamfer8
    chamfer8_edges = [part.edges().sort_by_distance(p)[0] for p in [
        (0, -1.5, -31),
    ]]
    chamfer8_side = [part.faces().sort_by_distance(p)[0] for p in [
        (0, 4.372732971, -31),
    ]]
    chamfer(chamfer8_edges, length=CHAMFER8_SIZE, length2=CHAMFER8_SIZE2, reference=chamfer8_side[0])

    # Chamfer11
    chamfer11_edges = [part.edges().sort_by_distance(p)[0] for p in [
        (20.8, 0, 1.623199176),
        (-20.8, 0, 1.623199176),
        (-20.8, 1.675177121, -23.25),
        (20.8, 1.675177121, -23.25),
    ]]
    chamfer(chamfer11_edges, length=CHAMFER11_SIZE)

    # Chamfer12
    chamfer12_edges = [part.edges().sort_by_distance(p)[0] for p in [
        (-23, -1.5, 2.542269499),
        (23, -1.5, 2.542269499),
    ]]
    chamfer(chamfer12_edges, length=CHAMFER12_SIZE)


solid = part.part
